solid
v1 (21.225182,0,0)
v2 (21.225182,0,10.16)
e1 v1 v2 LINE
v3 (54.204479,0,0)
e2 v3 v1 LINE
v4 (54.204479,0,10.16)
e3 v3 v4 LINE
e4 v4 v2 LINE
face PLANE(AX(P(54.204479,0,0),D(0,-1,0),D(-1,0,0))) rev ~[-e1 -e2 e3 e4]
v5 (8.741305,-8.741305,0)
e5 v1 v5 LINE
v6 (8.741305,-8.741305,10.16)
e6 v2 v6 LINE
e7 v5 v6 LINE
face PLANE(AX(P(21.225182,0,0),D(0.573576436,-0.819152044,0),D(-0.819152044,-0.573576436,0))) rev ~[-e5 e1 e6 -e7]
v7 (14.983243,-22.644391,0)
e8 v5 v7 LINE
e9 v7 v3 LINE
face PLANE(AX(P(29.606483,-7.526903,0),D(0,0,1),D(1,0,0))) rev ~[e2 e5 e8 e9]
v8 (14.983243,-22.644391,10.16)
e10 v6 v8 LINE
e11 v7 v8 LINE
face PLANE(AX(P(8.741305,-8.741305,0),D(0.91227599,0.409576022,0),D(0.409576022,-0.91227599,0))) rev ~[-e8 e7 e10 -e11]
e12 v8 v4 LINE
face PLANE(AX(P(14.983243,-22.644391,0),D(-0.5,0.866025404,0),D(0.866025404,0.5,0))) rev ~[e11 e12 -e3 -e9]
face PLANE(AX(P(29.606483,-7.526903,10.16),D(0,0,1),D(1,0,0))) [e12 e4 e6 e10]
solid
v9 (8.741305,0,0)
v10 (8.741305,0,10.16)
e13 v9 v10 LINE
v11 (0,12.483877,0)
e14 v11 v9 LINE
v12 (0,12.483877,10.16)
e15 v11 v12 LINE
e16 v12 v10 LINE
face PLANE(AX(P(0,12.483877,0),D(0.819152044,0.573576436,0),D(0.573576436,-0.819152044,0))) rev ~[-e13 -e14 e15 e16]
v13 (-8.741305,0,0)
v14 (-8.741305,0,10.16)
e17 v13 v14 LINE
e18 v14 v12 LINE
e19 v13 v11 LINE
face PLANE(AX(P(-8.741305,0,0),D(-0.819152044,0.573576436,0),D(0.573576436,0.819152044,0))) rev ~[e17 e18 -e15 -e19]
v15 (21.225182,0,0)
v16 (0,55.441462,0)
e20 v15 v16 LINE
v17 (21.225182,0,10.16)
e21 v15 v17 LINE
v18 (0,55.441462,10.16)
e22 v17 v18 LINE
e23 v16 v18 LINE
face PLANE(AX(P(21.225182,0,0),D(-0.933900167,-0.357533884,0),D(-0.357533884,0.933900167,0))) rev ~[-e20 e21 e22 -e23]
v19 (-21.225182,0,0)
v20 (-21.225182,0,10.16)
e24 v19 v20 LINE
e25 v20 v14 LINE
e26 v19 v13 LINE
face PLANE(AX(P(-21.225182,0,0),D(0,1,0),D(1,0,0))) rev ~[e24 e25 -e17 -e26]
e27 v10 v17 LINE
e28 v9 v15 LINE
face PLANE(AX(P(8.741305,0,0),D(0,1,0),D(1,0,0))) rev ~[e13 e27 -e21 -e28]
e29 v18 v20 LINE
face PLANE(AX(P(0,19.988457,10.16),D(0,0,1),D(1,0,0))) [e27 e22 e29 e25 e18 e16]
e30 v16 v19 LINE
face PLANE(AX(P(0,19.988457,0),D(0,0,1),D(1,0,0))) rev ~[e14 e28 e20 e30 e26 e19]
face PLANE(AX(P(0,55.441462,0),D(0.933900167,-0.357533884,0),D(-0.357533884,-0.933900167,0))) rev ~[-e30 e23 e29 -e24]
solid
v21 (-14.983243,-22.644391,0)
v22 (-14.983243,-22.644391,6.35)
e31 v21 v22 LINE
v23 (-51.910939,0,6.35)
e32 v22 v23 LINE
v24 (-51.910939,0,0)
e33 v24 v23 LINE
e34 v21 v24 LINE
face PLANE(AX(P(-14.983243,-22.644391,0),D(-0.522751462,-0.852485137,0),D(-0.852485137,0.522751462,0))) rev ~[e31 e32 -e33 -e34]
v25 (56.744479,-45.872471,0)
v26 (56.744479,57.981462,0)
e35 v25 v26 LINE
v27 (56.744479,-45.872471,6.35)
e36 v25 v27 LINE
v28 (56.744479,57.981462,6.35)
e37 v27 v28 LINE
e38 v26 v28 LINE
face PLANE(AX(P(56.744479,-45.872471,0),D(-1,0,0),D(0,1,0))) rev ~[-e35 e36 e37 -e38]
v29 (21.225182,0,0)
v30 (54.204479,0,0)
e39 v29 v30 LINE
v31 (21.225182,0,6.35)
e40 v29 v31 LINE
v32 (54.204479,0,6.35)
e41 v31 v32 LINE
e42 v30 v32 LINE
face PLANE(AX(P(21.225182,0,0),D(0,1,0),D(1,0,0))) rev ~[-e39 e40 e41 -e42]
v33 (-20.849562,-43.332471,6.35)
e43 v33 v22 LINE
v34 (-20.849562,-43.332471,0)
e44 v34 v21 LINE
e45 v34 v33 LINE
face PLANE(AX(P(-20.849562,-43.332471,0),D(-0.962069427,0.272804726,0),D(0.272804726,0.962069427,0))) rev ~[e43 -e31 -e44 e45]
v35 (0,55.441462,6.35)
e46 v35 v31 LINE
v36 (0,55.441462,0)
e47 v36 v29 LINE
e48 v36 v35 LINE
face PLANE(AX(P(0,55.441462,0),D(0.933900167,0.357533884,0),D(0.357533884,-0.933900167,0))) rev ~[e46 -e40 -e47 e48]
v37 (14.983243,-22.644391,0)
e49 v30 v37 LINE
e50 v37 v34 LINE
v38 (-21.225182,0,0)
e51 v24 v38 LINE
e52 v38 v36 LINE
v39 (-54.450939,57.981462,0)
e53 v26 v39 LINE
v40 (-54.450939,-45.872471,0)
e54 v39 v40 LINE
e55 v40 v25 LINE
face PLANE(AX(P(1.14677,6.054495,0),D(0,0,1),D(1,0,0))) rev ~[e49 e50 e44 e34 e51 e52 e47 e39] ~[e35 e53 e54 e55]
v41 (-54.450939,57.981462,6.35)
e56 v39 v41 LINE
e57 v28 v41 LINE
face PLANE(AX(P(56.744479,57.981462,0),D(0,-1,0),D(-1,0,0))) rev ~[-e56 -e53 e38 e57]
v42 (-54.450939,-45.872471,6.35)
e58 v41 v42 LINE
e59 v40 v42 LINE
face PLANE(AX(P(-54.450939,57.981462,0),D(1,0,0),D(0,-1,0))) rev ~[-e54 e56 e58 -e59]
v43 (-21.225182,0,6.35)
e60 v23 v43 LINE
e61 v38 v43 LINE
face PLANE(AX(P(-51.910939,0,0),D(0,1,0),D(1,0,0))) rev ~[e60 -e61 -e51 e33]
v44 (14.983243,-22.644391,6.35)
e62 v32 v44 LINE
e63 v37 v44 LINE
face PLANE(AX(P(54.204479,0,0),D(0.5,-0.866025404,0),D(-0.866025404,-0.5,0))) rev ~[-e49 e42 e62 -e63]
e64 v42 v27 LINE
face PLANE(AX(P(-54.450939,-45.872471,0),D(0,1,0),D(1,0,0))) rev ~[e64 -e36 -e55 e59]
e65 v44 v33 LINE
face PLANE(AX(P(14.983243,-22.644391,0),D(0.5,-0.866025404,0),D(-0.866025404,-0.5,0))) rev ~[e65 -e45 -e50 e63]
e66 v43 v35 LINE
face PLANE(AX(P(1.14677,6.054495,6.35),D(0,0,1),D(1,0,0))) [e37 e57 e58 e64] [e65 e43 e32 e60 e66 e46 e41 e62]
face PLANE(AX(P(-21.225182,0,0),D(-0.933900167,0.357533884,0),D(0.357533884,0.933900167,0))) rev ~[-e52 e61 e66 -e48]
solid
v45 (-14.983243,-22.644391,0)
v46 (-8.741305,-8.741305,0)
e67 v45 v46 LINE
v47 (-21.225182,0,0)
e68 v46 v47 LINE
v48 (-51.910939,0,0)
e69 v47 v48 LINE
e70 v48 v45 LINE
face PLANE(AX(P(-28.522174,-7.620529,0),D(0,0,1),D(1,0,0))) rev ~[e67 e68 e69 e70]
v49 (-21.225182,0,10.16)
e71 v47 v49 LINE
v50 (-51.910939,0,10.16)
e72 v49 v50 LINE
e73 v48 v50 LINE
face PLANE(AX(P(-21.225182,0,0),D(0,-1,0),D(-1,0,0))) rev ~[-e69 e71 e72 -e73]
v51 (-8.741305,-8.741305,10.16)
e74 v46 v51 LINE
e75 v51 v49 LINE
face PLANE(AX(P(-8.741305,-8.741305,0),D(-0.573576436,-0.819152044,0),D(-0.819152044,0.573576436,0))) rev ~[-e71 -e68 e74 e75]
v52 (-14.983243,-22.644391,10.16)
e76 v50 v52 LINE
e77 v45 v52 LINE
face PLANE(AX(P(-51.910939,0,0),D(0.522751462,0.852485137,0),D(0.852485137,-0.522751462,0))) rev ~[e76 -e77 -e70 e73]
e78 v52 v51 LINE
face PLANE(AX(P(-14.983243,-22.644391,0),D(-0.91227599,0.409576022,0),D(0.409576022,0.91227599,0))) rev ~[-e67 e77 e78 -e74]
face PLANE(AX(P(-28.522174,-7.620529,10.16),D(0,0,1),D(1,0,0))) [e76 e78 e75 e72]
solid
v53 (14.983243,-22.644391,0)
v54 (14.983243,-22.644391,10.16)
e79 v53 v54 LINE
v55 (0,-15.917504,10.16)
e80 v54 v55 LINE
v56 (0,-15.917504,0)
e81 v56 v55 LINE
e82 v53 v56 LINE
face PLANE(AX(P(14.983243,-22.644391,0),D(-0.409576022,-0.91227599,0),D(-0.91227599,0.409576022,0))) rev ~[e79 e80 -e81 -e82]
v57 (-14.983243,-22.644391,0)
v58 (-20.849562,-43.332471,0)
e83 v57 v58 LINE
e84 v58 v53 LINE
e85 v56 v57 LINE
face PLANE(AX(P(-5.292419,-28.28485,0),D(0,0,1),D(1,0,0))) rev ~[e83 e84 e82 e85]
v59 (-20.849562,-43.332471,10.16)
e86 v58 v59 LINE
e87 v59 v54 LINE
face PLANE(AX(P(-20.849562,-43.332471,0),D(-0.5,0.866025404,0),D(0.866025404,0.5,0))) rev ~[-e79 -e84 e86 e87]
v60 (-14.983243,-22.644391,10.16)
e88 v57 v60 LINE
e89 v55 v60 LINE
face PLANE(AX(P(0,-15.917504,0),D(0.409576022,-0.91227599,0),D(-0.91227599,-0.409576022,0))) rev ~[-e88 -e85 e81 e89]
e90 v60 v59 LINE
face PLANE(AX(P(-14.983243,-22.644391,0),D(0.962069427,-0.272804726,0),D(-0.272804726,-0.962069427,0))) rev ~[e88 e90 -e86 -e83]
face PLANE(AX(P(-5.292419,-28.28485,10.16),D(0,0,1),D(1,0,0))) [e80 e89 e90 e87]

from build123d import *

# Parameters (mm, degrees)
F1_DEPTH = 6.35
F2_DEPTH = 10.16


# Not quite as in the source:
# - a feature names something its author has since deleted; it is built from what else it names


with BuildPart() as f1:
    # F0 (on Top) → F1 (new body)
    with BuildSketch(Plane.XY):
        Polygon((56.7444791493, 57.9814615035), (-51.9109388844, 57.9814615035), (-54.4509388844, 57.9814615035), (-54.4509388844, -45.8724710478), (-51.9109388844, -45.8724710478), (56.7444791493, -45.8724710478), align=None)
        Polygon((-51.9109388844, 0), (-21.225182045, 0), (0, 55.4414615035), (21.225182045, 0), (54.2044791493, 0), (14.9832434675, -22.6443909789), (-20.8495623229, -43.3324710478), (-14.9832434675, -22.6443909789), align=None, mode=Mode.SUBTRACT)
    extrude(amount=F1_DEPTH)


with BuildPart() as f2:
    # F0 (on Top) → F2 (new body)
    with BuildSketch(Plane.XY):
        Polygon((-8.74130489, 0), (0, 12.483877155), (8.74130489, 0), (21.225182045, 0), (0, 55.4414615035), (-21.225182045, 0), align=None)
    extrude(amount=F2_DEPTH)


with BuildPart() as f2b:
    # F0 (on Top) → F2, piece 2 (new body)
    with BuildSketch(Plane.XY):
        Polygon((-8.74130489, -8.74130489), (-21.225182045, 0), (-51.9109388844, 0), (-14.9832434675, -22.6443909789), align=None)
    extrude(amount=F2_DEPTH)


with BuildPart() as f2c:
    # F0 (on Top) → F2, piece 3 (new body)
    with BuildSketch(Plane.XY):
        Polygon((0, -15.9175042418), (-14.9832434675, -22.6443909789), (-20.8495623229, -43.3324710478), (14.9832434675, -22.6443909789), align=None)
    extrude(amount=F2_DEPTH)


with BuildPart() as f2d:
    # F0 (on Top) → F2, piece 4 (new body)
    with BuildSketch(Plane.XY):
        Polygon((54.2044791493, 0), (21.225182045, 0), (8.74130489, -8.74130489), (14.9832434675, -22.6443909789), align=None)
    extrude(amount=F2_DEPTH)


solid = Compound([f1.part, f2.part, f2b.part, f2c.part, f2d.part])
